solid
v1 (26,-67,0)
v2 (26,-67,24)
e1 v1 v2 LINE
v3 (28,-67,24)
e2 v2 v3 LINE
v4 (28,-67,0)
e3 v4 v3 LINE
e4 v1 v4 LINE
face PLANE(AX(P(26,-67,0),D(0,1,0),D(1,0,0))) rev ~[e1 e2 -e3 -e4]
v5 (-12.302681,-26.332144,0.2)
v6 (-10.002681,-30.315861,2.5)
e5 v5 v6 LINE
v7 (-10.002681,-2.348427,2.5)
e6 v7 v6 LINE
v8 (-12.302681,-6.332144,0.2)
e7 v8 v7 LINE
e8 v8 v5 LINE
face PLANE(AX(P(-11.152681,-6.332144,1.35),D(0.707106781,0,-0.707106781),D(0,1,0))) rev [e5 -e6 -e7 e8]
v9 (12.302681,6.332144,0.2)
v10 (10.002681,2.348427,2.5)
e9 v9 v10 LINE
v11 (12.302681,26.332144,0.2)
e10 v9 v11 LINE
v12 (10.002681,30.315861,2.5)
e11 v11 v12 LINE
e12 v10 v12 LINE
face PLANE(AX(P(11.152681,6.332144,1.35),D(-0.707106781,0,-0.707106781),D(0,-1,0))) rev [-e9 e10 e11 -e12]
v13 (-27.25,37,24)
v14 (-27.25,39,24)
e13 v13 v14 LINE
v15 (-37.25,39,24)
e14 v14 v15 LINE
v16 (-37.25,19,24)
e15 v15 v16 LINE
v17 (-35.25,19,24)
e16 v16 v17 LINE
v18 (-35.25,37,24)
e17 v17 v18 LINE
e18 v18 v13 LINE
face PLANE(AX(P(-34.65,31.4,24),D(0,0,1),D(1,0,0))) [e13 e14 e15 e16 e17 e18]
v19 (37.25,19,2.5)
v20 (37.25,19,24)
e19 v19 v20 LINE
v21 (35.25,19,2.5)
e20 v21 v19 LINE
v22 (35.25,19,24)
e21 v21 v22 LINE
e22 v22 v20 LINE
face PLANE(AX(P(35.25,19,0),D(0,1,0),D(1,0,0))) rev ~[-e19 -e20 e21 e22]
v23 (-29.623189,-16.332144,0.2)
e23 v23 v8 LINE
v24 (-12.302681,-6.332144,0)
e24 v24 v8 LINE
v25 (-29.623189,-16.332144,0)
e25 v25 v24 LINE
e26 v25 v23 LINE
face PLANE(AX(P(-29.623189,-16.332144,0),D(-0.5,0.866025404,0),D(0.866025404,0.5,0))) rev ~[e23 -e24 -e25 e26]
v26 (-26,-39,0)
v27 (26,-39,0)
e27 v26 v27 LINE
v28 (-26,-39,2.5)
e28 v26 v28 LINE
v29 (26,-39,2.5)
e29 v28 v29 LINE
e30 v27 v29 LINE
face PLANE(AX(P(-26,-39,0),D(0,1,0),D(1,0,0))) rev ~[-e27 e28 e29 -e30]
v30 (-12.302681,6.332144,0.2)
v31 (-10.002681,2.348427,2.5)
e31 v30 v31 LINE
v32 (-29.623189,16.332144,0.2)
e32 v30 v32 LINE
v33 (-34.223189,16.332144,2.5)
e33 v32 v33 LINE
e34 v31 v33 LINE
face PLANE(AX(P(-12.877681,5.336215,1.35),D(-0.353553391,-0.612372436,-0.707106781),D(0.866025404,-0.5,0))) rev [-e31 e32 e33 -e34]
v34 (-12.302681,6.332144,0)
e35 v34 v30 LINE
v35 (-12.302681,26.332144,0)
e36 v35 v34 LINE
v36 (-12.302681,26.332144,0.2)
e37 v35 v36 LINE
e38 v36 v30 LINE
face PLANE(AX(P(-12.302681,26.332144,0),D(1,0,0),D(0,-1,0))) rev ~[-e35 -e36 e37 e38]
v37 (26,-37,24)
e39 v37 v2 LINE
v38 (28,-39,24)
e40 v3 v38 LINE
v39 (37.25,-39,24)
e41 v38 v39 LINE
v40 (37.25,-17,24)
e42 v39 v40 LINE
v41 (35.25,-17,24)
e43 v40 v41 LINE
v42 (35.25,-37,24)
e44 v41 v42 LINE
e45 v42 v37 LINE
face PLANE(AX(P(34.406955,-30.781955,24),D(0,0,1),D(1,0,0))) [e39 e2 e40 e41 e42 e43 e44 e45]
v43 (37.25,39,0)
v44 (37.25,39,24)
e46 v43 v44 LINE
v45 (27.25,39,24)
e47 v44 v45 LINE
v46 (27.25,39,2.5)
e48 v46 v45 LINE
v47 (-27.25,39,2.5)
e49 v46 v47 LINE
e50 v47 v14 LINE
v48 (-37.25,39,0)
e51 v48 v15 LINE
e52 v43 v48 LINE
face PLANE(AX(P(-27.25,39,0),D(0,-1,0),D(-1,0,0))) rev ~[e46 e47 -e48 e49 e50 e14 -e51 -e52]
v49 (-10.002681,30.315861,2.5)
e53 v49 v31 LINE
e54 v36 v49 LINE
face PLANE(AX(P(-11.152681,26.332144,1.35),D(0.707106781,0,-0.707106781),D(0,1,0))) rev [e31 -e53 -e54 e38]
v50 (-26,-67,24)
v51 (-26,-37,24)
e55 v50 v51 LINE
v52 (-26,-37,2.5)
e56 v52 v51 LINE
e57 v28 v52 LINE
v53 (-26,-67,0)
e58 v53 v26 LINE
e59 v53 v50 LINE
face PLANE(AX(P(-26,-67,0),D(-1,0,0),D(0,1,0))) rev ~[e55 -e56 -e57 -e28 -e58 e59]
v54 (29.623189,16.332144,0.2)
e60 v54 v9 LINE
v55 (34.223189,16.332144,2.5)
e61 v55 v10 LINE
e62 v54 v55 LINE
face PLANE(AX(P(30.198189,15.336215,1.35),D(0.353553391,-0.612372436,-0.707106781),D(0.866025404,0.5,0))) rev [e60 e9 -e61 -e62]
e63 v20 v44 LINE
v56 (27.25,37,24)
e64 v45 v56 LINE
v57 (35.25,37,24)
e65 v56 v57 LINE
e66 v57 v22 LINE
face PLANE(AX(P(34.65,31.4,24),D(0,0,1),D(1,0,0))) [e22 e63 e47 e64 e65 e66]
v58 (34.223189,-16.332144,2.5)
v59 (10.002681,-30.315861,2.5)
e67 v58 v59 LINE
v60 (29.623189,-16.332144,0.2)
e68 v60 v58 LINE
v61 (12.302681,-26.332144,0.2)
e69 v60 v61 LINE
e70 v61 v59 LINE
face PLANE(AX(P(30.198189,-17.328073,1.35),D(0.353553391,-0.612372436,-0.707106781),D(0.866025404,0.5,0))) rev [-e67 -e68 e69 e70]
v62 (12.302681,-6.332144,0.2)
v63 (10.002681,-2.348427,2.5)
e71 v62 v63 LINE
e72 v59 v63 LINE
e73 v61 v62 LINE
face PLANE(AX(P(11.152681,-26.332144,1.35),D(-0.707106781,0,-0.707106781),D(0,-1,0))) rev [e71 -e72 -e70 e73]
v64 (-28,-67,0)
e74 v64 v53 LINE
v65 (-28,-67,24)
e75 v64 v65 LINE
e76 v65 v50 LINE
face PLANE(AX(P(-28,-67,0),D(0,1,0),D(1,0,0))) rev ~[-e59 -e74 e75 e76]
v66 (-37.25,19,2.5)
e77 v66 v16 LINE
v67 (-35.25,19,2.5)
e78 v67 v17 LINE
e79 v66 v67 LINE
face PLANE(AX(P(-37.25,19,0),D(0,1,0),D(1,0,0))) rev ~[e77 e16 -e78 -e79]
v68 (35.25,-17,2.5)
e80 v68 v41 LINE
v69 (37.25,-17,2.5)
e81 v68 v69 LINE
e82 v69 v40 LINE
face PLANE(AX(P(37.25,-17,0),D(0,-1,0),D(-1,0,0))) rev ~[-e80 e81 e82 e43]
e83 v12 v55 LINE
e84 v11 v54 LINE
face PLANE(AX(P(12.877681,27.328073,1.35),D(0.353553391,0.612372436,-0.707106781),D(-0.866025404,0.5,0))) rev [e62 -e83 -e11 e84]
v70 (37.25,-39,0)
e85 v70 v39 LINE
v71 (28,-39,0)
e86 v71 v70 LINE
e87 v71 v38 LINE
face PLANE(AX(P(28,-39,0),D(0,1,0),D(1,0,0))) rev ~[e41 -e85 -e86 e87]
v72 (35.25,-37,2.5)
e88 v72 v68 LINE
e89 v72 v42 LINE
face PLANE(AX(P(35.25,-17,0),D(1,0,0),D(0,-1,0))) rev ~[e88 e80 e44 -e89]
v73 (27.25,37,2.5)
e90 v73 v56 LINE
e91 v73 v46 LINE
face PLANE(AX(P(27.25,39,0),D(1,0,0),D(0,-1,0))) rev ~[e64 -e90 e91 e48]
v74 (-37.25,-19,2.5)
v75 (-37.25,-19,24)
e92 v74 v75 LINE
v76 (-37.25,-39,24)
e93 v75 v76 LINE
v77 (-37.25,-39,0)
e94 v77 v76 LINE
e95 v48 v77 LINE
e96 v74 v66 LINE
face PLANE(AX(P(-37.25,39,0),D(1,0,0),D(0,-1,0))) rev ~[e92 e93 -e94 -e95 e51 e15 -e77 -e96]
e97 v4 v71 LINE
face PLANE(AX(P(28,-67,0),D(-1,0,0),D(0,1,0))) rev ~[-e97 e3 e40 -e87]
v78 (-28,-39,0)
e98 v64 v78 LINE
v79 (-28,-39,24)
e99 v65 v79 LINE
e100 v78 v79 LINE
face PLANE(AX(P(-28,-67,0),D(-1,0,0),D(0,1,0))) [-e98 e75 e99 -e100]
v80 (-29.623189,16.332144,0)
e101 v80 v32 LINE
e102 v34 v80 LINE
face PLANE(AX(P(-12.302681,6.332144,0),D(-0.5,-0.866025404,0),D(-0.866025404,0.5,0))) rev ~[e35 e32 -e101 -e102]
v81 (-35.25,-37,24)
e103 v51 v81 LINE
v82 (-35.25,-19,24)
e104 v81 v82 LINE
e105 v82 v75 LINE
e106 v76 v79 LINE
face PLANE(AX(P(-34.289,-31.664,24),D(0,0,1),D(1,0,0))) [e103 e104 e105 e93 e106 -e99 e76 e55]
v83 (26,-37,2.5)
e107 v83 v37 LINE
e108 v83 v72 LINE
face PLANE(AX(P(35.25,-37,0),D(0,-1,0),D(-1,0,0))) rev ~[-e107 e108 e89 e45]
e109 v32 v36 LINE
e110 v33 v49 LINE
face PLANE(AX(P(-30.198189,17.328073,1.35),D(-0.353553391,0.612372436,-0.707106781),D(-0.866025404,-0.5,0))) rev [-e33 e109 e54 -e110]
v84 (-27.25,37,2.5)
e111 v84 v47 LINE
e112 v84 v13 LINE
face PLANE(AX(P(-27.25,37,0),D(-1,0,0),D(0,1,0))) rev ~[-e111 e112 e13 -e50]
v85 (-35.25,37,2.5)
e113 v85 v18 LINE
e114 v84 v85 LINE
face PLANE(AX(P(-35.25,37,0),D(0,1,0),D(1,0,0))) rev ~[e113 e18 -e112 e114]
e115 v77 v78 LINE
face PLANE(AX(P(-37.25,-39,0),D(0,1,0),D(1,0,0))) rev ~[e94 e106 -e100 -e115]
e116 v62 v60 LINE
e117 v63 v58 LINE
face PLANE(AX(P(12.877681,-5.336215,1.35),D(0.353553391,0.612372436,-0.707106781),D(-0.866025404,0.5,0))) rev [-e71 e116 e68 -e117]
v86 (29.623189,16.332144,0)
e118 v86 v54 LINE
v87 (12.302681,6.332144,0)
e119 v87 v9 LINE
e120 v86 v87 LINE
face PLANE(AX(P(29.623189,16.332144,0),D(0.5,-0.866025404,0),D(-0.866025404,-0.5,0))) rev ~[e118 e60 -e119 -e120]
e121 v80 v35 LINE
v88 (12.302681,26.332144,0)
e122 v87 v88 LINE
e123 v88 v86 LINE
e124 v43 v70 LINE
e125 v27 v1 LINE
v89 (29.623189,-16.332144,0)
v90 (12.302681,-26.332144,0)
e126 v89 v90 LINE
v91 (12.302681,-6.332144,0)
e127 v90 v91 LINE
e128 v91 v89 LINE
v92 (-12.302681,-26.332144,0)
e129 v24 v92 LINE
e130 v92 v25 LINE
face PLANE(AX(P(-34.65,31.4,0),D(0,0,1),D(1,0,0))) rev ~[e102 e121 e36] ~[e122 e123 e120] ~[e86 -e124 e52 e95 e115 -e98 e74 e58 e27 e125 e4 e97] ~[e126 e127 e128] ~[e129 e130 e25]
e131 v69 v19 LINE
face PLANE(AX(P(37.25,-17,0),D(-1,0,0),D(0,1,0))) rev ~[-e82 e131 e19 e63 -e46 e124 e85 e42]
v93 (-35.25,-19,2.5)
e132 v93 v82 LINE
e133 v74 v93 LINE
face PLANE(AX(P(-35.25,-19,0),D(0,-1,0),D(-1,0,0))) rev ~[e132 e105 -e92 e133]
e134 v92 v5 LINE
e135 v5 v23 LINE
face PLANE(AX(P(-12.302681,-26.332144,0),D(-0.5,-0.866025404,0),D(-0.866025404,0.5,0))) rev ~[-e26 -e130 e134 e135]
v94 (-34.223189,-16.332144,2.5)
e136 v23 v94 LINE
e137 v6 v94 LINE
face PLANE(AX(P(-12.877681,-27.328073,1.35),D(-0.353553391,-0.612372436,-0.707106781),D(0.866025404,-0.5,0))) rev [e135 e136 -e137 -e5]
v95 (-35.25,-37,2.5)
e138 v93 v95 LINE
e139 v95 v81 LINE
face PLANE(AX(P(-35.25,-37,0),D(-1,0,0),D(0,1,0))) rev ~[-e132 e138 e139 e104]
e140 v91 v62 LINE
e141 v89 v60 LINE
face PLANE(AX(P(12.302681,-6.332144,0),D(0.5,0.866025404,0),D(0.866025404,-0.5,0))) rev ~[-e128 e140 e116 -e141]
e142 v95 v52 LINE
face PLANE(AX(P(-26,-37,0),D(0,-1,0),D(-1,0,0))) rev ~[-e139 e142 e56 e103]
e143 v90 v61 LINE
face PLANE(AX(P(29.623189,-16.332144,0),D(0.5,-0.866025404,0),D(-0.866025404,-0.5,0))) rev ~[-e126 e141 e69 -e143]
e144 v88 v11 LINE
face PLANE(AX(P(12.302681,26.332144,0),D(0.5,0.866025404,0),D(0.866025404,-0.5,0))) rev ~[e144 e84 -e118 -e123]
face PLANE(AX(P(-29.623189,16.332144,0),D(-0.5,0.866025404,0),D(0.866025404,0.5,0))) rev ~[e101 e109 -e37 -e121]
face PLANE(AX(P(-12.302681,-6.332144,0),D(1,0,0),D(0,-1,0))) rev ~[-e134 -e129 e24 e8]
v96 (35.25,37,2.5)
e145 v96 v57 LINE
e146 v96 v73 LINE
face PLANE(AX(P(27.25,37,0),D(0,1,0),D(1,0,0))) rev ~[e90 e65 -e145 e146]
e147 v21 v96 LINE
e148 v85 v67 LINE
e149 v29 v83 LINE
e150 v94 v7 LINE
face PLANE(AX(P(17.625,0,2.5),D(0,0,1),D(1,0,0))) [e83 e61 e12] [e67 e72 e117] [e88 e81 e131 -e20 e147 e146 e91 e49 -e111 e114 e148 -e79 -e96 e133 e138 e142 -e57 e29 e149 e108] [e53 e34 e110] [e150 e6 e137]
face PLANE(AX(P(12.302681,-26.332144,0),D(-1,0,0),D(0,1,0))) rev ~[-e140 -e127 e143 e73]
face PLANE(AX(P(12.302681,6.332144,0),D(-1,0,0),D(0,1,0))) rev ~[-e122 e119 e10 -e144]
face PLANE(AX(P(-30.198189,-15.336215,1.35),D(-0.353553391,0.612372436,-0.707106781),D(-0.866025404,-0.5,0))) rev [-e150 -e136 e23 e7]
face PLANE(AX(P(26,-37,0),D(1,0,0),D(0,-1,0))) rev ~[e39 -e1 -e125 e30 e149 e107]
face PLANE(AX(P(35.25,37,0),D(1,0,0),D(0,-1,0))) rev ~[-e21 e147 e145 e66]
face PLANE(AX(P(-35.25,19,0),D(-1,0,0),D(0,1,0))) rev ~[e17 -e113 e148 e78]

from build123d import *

# Parameters (mm, degrees)
F0_W     = 26
F0_H     = 2
F0_W_2   = 27.25
F0_W_3   = 2
F0_H_2   = 36
F0_H_3   = 38
F1_DEPTH = 2.5
F2_SIZE  = 2.3
F0_H_4   = 28
F3_DEPTH = 24


with BuildPart() as f1:
    # F0 (on Top) → F1 (new body)
    with BuildSketch(Plane.XY):
        Polygon((0, 37), (0, -37), (26, -37), (35.25, -37), (35.25, -17), (35.25, 19), (35.25, 37), (27.25, 37), align=None)
        Polygon((12.302681016, -26.3321439177), (12.302681016, -6.3321439177), (29.6231890917, -16.3321439177), align=None, mode=Mode.SUBTRACT)
        Polygon((12.302681016, 26.3321439177), (29.6231890917, 16.3321439177), (12.302681016, 6.3321439177), align=None, mode=Mode.SUBTRACT)
        Polygon((-35.25, 19), (-35.25, -19), (-35.25, -37), (-26, -37), (0, -37), (0, 37), (-27.25, 37), (-35.25, 37), align=None)
        Polygon((-12.302681016, -26.3321439177), (-29.6231890917, -16.3321439177), (-12.302681016, -6.3321439177), align=None, mode=Mode.SUBTRACT)
        Polygon((-12.302681016, 26.3321439177), (-12.302681016, 6.3321439177), (-29.6231890917, 16.3321439177), align=None, mode=Mode.SUBTRACT)
        with Locations((-13, -38)):
            Rectangle(F0_W, F0_H)
        with Locations((13, -38)):
            Rectangle(F0_W, F0_H)
        with Locations((-13.625, 38)):
            Rectangle(F0_W_2, F0_H)
        with Locations((13.625, 38)):
            Rectangle(F0_W_2, F0_H)
        with Locations((36.25, 1)):
            Rectangle(F0_W_3, F0_H_2)
        with Locations((-36.25, 0)):
            Rectangle(F0_W_3, F0_H_3)
    extrude(amount=F1_DEPTH)

    # F2
    f2_edges = [f1.edges().sort_by_distance(p)[0] for p in [
        (-20.962935, -11.332144, 2.5),
        (-20.962935, -21.332144, 2.5),
        (-12.302681, -16.332144, 2.5),
        (20.962935, -11.332144, 2.5),
        (12.302681, -16.332144, 2.5),
        (20.962935, -21.332144, 2.5),
        (20.962935, 21.332144, 2.5),
        (12.302681, 16.332144, 2.5),
        (20.962935, 11.332144, 2.5),
        (-20.962935, 21.332144, 2.5),
        (-20.962935, 11.332144, 2.5),
        (-12.302681, 16.332144, 2.5),
    ]]
    chamfer(f2_edges, length=F2_SIZE)

    # F0 (on Top) → F3 (join)
    with BuildSketch(Plane.XY):
        Polygon((-37.25, 39), (-37.25, 19), (-35.25, 19), (-35.25, 37), (-27.25, 37), (-27.25, 39), align=None)
        Polygon((27.25, 39), (27.25, 37), (35.25, 37), (35.25, 19), (37.25, 19), (37.25, 39), align=None)
        Polygon((26, -37), (26, -39), (28, -39), (37.25, -39), (37.25, -17), (35.25, -17), (35.25, -37), align=None)
        Polygon((-37.25, -19), (-37.25, -39), (-28, -39), (-26, -39), (-26, -37), (-35.25, -37), (-35.25, -19), align=None)
        with Locations((27, -53)):
            Rectangle(F0_W_3, F0_H_4)
        with Locations((-27, -53)):
            Rectangle(F0_W_3, F0_H_4)
    extrude(amount=F3_DEPTH)


solid = f1.part
